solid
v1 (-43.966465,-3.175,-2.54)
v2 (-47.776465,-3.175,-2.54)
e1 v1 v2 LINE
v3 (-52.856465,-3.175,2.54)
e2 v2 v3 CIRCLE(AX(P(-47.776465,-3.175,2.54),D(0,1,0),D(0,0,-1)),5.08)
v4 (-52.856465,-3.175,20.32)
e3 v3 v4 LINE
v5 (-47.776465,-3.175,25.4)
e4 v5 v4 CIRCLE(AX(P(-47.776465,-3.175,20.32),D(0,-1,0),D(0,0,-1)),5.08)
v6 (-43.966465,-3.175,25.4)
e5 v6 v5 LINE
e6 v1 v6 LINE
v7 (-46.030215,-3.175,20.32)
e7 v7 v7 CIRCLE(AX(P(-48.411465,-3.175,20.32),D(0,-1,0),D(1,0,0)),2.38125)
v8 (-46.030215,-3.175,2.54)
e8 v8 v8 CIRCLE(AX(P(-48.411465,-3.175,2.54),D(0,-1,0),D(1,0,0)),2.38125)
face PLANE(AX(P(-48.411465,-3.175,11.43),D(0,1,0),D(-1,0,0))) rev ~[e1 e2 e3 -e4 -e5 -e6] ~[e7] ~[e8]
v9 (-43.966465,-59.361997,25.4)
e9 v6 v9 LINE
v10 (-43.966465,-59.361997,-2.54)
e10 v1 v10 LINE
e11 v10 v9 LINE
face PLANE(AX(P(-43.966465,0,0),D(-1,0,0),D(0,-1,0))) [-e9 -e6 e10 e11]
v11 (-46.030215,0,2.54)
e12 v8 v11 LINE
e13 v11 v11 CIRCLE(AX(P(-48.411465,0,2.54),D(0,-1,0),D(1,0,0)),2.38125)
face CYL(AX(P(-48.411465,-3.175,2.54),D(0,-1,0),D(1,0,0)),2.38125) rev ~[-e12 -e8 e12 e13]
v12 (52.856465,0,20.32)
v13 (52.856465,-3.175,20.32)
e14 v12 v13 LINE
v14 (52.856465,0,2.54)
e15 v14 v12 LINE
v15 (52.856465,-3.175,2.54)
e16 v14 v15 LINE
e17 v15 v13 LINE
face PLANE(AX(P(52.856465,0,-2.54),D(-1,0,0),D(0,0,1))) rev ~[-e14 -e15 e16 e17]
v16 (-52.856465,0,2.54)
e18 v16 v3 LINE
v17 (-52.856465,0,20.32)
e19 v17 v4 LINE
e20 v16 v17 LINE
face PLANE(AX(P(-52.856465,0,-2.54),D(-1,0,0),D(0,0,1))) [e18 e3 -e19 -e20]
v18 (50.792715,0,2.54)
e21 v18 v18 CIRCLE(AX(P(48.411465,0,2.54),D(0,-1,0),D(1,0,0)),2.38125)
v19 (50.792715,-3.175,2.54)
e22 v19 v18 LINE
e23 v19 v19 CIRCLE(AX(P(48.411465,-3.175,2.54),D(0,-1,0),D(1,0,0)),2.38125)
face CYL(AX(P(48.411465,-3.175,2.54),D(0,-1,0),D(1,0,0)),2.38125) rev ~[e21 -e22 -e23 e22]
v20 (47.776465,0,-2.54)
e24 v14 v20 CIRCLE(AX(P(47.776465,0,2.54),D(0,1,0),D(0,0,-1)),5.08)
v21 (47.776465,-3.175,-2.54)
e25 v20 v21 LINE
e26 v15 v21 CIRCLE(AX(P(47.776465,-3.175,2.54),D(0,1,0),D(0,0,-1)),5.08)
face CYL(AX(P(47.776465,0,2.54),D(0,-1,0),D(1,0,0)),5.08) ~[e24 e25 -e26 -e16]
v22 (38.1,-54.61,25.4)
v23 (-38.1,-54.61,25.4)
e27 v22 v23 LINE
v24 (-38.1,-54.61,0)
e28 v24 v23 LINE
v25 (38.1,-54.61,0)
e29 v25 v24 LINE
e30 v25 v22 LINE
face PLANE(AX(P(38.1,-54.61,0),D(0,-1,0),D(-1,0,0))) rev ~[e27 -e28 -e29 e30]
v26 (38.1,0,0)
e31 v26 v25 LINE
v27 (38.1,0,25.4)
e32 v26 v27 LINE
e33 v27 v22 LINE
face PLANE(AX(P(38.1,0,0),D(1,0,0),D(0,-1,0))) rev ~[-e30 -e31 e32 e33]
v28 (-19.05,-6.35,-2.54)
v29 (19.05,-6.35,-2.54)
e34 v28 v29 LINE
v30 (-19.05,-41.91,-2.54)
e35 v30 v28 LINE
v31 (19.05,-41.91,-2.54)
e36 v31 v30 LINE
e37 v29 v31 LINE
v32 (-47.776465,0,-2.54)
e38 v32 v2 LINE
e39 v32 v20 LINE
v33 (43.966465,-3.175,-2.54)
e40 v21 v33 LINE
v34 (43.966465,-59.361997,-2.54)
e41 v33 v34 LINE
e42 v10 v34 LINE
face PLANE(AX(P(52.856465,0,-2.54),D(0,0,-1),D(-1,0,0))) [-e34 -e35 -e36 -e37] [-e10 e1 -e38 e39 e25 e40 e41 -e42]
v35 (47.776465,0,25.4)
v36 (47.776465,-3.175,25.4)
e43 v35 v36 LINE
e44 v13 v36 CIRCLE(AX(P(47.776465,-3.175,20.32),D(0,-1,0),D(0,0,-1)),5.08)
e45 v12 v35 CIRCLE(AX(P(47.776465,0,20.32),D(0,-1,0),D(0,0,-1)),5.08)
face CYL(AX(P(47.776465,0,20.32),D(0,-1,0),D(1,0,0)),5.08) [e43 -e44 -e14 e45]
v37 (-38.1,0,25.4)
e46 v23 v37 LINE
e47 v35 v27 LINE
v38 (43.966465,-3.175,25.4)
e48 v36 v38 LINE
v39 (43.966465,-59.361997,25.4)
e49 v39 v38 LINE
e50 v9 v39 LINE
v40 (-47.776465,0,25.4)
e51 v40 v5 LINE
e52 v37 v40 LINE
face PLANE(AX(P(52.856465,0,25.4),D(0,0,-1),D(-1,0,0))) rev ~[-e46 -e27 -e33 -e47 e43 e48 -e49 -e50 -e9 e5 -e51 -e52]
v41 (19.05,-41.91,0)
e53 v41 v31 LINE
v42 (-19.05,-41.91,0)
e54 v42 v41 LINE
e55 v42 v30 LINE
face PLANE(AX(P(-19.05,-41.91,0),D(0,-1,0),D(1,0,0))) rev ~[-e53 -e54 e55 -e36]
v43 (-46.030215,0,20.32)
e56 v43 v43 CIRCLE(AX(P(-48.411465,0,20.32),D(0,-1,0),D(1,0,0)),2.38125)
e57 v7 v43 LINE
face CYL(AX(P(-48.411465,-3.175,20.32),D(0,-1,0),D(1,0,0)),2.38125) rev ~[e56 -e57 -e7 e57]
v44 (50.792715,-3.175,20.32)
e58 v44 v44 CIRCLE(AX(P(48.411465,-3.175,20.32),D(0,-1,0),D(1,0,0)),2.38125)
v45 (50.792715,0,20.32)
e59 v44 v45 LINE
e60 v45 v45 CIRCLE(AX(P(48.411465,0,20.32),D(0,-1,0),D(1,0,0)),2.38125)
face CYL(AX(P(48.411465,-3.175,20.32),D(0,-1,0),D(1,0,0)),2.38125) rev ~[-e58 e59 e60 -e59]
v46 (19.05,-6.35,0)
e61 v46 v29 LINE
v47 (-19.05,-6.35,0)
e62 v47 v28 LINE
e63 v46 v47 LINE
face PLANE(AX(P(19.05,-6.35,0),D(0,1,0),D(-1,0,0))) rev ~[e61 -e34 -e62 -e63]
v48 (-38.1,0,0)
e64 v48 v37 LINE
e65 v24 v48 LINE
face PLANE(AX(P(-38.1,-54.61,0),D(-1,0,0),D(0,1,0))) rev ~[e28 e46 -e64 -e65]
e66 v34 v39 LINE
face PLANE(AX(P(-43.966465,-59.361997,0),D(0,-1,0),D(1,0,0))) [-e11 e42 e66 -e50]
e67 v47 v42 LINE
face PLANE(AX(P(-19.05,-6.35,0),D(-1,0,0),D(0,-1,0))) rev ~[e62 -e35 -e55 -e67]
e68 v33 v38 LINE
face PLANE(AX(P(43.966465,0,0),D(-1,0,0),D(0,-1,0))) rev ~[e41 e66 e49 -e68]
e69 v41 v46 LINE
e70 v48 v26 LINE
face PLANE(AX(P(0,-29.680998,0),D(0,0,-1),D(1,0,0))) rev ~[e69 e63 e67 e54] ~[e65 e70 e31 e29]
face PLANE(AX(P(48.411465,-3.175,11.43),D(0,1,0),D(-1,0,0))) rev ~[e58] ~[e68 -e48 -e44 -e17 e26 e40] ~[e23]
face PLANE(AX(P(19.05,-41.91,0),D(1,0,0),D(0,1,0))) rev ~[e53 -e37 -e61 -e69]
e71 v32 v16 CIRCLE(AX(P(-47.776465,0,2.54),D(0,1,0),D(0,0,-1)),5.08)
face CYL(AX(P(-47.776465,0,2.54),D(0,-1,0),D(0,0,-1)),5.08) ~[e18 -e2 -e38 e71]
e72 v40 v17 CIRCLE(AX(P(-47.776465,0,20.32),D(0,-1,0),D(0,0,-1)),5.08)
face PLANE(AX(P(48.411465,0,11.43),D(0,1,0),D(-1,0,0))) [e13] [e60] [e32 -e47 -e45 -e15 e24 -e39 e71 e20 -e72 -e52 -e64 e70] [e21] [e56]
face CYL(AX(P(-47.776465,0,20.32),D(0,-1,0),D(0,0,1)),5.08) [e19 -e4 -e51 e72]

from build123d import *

# Parameters (mm, degrees)
F1_DEPTH  = 25.4
F2_W      = 87.9329293966
F2_H      = 59.3619965534
F3_DEPTH  = 2.54
F4_W      = 8.89
F4_H      = 27.94
F5_DEPTH  = 3.175
F7_DEPTH  = 2.541
F8_R      = 5.08
F9_R      = 2.38125
F10_DEPTH = 3.176


# Not quite as in the source:
# - a feature names something its author has since deleted; it is built from what else it names


with BuildPart() as f1:
    # F0 (on Top) → F1 (new body)
    with BuildSketch(Plane.XY):
        Polygon((38.1, -54.61), (-38.1, -54.61), (-38.1, 0), (-43.9664646983, 0), (-43.9664646983, -59.3619965534), (43.9664646983, -59.3619965534), (43.9664646983, 0), (38.1, 0), align=None)
    extrude(amount=F1_DEPTH)

    # F2 (on face) → F3 (join)
    with BuildSketch(Plane(origin=(0, 0, 0), x_dir=(1, 0, 0), z_dir=(0, 0, -1))):
        with Locations((0, 29.6809982767)):
            Rectangle(F2_W, F2_H)
    extrude(amount=F3_DEPTH)

    # F4 (on face) → F5 (join)
    with BuildSketch(Plane(origin=(0, 0, 0), x_dir=(-1, 0, 0), z_dir=(0, 1, 0))):
        with Locations((-48.4114646983, 11.43)):
            Rectangle(F4_W, F4_H)
        with Locations((48.4114646983, 11.43)):
            Rectangle(F4_W, F4_H)
    extrude(amount=-F5_DEPTH)

    # F6 (on face) → F7 (cut, through all)
    with BuildSketch(Plane.XY):
        Polygon((0, -6.35), (-19.05, -6.35), (-19.05, -41.91), (0, -41.91), (19.05, -41.91), (19.05, -6.35), align=None)
    extrude(amount=-F7_DEPTH, mode=Mode.SUBTRACT)

    # F8
    f8_edges = [f1.edges().sort_by_distance(p)[0] for p in [
        (52.856465, -1.5875, 25.4),
        (-52.856465, -1.5875, 25.4),
        (-52.856465, -1.5875, -2.54),
        (52.856465, -1.5875, -2.54),
    ]]
    fillet(f8_edges, radius=F8_R)

    # F9 (on face) → F10 (cut, through all)
    with BuildSketch(Plane.XZ.offset(3.175)):
        with Locations((48.4114646983, 20.32)):
            Circle(F9_R)
        with Locations((48.4114646983, 2.54)):
            Circle(F9_R)
        with Locations((-48.4114646983, 2.54)):
            Circle(F9_R)
        with Locations((-48.4114646983, 20.32)):
            Circle(F9_R)
    extrude(amount=-F10_DEPTH, mode=Mode.SUBTRACT)


solid = f1.part
